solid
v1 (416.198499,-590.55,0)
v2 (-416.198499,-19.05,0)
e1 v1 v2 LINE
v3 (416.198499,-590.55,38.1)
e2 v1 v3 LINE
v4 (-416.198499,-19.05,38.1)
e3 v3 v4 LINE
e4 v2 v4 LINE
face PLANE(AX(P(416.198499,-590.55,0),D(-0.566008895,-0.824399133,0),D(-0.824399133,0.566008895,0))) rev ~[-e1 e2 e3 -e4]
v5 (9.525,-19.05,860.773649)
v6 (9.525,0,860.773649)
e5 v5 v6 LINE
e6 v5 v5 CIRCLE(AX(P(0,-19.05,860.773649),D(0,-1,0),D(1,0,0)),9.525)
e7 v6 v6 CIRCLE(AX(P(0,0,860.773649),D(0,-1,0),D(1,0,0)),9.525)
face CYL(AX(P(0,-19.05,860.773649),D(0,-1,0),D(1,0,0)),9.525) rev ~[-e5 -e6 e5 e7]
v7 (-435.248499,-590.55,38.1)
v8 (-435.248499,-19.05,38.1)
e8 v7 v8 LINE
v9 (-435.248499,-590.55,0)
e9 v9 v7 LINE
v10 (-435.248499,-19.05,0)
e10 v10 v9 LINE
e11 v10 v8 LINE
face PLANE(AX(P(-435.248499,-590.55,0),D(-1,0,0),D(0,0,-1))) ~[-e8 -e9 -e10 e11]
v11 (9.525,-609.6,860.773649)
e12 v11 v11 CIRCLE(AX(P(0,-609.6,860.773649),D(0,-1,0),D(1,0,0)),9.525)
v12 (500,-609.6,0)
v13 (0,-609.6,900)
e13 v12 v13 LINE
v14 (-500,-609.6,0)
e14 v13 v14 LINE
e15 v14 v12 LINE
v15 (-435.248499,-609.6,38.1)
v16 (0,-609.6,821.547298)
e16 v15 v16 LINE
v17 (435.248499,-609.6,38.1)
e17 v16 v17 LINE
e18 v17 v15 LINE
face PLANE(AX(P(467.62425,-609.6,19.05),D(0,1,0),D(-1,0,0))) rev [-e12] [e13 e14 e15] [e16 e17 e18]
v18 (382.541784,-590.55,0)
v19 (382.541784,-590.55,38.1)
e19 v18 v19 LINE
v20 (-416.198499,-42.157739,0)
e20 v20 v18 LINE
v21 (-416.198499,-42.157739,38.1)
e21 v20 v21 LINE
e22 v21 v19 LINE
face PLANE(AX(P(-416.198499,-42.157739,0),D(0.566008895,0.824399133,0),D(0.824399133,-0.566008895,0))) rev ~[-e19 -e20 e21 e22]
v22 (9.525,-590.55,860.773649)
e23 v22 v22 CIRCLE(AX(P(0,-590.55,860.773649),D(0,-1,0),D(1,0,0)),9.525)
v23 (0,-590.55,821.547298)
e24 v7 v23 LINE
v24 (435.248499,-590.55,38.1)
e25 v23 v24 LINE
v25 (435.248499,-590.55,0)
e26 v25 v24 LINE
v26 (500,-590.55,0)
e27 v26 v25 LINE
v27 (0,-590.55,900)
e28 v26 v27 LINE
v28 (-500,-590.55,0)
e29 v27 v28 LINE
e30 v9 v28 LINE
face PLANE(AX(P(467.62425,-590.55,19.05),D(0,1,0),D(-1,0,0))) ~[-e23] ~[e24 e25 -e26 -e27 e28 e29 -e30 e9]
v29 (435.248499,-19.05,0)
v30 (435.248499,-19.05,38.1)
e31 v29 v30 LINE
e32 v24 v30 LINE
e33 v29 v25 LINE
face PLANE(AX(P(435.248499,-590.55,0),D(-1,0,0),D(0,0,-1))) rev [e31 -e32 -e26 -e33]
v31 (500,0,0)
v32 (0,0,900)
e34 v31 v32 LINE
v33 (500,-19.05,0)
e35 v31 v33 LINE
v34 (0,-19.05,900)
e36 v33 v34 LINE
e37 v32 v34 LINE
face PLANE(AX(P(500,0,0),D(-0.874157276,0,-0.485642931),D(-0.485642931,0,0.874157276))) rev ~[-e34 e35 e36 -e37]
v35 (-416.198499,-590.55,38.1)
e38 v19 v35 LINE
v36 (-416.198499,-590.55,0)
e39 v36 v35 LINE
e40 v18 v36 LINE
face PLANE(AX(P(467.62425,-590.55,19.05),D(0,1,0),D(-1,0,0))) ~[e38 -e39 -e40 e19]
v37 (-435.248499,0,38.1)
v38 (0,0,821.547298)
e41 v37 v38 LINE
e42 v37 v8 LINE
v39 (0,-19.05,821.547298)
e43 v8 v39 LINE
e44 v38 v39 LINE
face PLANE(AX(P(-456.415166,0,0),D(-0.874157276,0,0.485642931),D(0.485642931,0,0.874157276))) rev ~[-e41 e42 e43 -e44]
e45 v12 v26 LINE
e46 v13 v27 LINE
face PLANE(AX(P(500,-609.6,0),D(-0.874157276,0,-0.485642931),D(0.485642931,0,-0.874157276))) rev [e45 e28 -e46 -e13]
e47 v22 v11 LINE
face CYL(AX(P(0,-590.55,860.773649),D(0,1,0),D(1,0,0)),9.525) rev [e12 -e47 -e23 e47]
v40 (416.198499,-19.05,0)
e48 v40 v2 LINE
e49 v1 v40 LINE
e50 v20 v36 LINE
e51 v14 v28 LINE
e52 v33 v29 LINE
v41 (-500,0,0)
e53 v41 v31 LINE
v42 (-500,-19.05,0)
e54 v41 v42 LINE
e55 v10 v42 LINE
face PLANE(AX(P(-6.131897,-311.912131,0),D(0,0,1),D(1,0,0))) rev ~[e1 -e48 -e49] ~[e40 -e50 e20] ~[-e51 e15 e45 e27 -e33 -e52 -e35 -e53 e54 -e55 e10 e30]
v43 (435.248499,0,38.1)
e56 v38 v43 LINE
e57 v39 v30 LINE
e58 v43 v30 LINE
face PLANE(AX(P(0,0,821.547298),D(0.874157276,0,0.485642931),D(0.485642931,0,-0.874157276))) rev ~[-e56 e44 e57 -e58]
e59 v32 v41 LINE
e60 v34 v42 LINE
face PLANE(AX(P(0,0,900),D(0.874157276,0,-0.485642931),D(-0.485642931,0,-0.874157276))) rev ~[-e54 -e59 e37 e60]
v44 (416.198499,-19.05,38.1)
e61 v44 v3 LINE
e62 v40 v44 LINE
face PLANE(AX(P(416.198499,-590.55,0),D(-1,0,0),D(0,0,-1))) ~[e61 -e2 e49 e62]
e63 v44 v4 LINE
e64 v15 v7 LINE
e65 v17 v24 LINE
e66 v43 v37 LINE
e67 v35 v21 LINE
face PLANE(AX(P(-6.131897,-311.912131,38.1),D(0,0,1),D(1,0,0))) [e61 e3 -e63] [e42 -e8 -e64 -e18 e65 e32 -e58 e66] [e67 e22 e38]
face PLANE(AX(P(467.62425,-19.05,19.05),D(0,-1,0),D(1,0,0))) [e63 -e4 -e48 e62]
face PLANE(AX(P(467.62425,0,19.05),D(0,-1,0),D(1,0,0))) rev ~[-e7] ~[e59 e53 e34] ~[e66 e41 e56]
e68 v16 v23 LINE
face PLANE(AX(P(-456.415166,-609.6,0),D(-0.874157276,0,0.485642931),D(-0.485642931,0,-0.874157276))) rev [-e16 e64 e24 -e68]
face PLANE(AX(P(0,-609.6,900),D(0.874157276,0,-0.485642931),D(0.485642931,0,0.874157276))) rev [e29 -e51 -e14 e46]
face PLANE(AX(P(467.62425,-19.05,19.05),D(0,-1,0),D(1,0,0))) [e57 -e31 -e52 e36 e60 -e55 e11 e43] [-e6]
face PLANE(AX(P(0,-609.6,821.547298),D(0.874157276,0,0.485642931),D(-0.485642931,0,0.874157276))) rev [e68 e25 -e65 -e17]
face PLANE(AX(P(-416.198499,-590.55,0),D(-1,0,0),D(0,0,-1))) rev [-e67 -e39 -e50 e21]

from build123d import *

# Parameters (mm, degrees)
F1_DEPTH = 19.05
F2_DEPTH = 19.05
F3_R     = 9.525
F4_DEPTH = 25
F5_W     = 19.05
F5_H     = 38.1
F6_DEPTH = 285.75
F9_DEPTH = 38.1


# Not quite as in the source:
# - a feature names something its author has since deleted; it is built from what else it names


with BuildPart() as f1:
    # F0 (on Front) → F1 (new body)
    with BuildSketch(Plane.XZ):
        Polygon((435.2484990698, 38.1), (-435.2484990698, 38.1), (-456.4151657365, 0), (456.4151657365, 0), align=None)
    extrude(amount=F1_DEPTH)

    # F0 (on Front) → F2 (join)
    with BuildSketch(Plane.XZ):
        Polygon((500, 0), (478.8333333333, 38.1), (435.2484990698, 38.1), (456.4151657365, 0), align=None)
        Polygon((478.8333333333, 38.1), (21.7924171318, 860.7736491628), (0, 821.5472983257), (435.2484990698, 38.1), align=None)
        Polygon((21.7924171318, 860.7736491628), (0, 900), (-21.7924171318, 860.7736491628), (0, 821.5472983257), align=None)
        Polygon((0, 821.5472983257), (-21.7924171318, 860.7736491628), (-478.8333333333, 38.1), (-435.2484990698, 38.1), align=None)
        Polygon((-435.2484990698, 38.1), (-478.8333333333, 38.1), (-500, 0), (-456.4151657365, 0), align=None)
    extrude(amount=F2_DEPTH)

    # F3 (on face) → F4 (cut)
    with BuildSketch(Plane.XZ.offset(19.05)):
        with Locations((0, 860.7736491628)):
            Circle(F3_R)
    extrude(amount=-F4_DEPTH, mode=Mode.SUBTRACT)

    # F5 (on face) → F6 (join)
    with BuildSketch(Plane.XZ.offset(19.05)):
        with Locations((-425.7234990698, 19.05)):
            Rectangle(F5_W, F5_H)
        with Locations((425.7234990698, 19.05)):
            Rectangle(F5_W, F5_H)
    extrude(amount=F6_DEPTH)

    # F7: F1 across face


with BuildPart() as f1_1:
    add(f1.part)
    add(f1.part.mirror(Plane(origin=(425.7234990698, -304.8, 19.05), x_dir=(1, 0, 0), z_dir=(0, -1, 0))))

    # F8 (on Top) → F9 (join, through all)
    with BuildSketch(Plane.XY):
        Polygon((416.1984990698, -590.55), (-416.1984990698, -19.05), (-416.1984990698, -42.1577389905), (382.5417841626, -590.55), align=None)
    extrude(amount=F9_DEPTH)


solid = f1_1.part
